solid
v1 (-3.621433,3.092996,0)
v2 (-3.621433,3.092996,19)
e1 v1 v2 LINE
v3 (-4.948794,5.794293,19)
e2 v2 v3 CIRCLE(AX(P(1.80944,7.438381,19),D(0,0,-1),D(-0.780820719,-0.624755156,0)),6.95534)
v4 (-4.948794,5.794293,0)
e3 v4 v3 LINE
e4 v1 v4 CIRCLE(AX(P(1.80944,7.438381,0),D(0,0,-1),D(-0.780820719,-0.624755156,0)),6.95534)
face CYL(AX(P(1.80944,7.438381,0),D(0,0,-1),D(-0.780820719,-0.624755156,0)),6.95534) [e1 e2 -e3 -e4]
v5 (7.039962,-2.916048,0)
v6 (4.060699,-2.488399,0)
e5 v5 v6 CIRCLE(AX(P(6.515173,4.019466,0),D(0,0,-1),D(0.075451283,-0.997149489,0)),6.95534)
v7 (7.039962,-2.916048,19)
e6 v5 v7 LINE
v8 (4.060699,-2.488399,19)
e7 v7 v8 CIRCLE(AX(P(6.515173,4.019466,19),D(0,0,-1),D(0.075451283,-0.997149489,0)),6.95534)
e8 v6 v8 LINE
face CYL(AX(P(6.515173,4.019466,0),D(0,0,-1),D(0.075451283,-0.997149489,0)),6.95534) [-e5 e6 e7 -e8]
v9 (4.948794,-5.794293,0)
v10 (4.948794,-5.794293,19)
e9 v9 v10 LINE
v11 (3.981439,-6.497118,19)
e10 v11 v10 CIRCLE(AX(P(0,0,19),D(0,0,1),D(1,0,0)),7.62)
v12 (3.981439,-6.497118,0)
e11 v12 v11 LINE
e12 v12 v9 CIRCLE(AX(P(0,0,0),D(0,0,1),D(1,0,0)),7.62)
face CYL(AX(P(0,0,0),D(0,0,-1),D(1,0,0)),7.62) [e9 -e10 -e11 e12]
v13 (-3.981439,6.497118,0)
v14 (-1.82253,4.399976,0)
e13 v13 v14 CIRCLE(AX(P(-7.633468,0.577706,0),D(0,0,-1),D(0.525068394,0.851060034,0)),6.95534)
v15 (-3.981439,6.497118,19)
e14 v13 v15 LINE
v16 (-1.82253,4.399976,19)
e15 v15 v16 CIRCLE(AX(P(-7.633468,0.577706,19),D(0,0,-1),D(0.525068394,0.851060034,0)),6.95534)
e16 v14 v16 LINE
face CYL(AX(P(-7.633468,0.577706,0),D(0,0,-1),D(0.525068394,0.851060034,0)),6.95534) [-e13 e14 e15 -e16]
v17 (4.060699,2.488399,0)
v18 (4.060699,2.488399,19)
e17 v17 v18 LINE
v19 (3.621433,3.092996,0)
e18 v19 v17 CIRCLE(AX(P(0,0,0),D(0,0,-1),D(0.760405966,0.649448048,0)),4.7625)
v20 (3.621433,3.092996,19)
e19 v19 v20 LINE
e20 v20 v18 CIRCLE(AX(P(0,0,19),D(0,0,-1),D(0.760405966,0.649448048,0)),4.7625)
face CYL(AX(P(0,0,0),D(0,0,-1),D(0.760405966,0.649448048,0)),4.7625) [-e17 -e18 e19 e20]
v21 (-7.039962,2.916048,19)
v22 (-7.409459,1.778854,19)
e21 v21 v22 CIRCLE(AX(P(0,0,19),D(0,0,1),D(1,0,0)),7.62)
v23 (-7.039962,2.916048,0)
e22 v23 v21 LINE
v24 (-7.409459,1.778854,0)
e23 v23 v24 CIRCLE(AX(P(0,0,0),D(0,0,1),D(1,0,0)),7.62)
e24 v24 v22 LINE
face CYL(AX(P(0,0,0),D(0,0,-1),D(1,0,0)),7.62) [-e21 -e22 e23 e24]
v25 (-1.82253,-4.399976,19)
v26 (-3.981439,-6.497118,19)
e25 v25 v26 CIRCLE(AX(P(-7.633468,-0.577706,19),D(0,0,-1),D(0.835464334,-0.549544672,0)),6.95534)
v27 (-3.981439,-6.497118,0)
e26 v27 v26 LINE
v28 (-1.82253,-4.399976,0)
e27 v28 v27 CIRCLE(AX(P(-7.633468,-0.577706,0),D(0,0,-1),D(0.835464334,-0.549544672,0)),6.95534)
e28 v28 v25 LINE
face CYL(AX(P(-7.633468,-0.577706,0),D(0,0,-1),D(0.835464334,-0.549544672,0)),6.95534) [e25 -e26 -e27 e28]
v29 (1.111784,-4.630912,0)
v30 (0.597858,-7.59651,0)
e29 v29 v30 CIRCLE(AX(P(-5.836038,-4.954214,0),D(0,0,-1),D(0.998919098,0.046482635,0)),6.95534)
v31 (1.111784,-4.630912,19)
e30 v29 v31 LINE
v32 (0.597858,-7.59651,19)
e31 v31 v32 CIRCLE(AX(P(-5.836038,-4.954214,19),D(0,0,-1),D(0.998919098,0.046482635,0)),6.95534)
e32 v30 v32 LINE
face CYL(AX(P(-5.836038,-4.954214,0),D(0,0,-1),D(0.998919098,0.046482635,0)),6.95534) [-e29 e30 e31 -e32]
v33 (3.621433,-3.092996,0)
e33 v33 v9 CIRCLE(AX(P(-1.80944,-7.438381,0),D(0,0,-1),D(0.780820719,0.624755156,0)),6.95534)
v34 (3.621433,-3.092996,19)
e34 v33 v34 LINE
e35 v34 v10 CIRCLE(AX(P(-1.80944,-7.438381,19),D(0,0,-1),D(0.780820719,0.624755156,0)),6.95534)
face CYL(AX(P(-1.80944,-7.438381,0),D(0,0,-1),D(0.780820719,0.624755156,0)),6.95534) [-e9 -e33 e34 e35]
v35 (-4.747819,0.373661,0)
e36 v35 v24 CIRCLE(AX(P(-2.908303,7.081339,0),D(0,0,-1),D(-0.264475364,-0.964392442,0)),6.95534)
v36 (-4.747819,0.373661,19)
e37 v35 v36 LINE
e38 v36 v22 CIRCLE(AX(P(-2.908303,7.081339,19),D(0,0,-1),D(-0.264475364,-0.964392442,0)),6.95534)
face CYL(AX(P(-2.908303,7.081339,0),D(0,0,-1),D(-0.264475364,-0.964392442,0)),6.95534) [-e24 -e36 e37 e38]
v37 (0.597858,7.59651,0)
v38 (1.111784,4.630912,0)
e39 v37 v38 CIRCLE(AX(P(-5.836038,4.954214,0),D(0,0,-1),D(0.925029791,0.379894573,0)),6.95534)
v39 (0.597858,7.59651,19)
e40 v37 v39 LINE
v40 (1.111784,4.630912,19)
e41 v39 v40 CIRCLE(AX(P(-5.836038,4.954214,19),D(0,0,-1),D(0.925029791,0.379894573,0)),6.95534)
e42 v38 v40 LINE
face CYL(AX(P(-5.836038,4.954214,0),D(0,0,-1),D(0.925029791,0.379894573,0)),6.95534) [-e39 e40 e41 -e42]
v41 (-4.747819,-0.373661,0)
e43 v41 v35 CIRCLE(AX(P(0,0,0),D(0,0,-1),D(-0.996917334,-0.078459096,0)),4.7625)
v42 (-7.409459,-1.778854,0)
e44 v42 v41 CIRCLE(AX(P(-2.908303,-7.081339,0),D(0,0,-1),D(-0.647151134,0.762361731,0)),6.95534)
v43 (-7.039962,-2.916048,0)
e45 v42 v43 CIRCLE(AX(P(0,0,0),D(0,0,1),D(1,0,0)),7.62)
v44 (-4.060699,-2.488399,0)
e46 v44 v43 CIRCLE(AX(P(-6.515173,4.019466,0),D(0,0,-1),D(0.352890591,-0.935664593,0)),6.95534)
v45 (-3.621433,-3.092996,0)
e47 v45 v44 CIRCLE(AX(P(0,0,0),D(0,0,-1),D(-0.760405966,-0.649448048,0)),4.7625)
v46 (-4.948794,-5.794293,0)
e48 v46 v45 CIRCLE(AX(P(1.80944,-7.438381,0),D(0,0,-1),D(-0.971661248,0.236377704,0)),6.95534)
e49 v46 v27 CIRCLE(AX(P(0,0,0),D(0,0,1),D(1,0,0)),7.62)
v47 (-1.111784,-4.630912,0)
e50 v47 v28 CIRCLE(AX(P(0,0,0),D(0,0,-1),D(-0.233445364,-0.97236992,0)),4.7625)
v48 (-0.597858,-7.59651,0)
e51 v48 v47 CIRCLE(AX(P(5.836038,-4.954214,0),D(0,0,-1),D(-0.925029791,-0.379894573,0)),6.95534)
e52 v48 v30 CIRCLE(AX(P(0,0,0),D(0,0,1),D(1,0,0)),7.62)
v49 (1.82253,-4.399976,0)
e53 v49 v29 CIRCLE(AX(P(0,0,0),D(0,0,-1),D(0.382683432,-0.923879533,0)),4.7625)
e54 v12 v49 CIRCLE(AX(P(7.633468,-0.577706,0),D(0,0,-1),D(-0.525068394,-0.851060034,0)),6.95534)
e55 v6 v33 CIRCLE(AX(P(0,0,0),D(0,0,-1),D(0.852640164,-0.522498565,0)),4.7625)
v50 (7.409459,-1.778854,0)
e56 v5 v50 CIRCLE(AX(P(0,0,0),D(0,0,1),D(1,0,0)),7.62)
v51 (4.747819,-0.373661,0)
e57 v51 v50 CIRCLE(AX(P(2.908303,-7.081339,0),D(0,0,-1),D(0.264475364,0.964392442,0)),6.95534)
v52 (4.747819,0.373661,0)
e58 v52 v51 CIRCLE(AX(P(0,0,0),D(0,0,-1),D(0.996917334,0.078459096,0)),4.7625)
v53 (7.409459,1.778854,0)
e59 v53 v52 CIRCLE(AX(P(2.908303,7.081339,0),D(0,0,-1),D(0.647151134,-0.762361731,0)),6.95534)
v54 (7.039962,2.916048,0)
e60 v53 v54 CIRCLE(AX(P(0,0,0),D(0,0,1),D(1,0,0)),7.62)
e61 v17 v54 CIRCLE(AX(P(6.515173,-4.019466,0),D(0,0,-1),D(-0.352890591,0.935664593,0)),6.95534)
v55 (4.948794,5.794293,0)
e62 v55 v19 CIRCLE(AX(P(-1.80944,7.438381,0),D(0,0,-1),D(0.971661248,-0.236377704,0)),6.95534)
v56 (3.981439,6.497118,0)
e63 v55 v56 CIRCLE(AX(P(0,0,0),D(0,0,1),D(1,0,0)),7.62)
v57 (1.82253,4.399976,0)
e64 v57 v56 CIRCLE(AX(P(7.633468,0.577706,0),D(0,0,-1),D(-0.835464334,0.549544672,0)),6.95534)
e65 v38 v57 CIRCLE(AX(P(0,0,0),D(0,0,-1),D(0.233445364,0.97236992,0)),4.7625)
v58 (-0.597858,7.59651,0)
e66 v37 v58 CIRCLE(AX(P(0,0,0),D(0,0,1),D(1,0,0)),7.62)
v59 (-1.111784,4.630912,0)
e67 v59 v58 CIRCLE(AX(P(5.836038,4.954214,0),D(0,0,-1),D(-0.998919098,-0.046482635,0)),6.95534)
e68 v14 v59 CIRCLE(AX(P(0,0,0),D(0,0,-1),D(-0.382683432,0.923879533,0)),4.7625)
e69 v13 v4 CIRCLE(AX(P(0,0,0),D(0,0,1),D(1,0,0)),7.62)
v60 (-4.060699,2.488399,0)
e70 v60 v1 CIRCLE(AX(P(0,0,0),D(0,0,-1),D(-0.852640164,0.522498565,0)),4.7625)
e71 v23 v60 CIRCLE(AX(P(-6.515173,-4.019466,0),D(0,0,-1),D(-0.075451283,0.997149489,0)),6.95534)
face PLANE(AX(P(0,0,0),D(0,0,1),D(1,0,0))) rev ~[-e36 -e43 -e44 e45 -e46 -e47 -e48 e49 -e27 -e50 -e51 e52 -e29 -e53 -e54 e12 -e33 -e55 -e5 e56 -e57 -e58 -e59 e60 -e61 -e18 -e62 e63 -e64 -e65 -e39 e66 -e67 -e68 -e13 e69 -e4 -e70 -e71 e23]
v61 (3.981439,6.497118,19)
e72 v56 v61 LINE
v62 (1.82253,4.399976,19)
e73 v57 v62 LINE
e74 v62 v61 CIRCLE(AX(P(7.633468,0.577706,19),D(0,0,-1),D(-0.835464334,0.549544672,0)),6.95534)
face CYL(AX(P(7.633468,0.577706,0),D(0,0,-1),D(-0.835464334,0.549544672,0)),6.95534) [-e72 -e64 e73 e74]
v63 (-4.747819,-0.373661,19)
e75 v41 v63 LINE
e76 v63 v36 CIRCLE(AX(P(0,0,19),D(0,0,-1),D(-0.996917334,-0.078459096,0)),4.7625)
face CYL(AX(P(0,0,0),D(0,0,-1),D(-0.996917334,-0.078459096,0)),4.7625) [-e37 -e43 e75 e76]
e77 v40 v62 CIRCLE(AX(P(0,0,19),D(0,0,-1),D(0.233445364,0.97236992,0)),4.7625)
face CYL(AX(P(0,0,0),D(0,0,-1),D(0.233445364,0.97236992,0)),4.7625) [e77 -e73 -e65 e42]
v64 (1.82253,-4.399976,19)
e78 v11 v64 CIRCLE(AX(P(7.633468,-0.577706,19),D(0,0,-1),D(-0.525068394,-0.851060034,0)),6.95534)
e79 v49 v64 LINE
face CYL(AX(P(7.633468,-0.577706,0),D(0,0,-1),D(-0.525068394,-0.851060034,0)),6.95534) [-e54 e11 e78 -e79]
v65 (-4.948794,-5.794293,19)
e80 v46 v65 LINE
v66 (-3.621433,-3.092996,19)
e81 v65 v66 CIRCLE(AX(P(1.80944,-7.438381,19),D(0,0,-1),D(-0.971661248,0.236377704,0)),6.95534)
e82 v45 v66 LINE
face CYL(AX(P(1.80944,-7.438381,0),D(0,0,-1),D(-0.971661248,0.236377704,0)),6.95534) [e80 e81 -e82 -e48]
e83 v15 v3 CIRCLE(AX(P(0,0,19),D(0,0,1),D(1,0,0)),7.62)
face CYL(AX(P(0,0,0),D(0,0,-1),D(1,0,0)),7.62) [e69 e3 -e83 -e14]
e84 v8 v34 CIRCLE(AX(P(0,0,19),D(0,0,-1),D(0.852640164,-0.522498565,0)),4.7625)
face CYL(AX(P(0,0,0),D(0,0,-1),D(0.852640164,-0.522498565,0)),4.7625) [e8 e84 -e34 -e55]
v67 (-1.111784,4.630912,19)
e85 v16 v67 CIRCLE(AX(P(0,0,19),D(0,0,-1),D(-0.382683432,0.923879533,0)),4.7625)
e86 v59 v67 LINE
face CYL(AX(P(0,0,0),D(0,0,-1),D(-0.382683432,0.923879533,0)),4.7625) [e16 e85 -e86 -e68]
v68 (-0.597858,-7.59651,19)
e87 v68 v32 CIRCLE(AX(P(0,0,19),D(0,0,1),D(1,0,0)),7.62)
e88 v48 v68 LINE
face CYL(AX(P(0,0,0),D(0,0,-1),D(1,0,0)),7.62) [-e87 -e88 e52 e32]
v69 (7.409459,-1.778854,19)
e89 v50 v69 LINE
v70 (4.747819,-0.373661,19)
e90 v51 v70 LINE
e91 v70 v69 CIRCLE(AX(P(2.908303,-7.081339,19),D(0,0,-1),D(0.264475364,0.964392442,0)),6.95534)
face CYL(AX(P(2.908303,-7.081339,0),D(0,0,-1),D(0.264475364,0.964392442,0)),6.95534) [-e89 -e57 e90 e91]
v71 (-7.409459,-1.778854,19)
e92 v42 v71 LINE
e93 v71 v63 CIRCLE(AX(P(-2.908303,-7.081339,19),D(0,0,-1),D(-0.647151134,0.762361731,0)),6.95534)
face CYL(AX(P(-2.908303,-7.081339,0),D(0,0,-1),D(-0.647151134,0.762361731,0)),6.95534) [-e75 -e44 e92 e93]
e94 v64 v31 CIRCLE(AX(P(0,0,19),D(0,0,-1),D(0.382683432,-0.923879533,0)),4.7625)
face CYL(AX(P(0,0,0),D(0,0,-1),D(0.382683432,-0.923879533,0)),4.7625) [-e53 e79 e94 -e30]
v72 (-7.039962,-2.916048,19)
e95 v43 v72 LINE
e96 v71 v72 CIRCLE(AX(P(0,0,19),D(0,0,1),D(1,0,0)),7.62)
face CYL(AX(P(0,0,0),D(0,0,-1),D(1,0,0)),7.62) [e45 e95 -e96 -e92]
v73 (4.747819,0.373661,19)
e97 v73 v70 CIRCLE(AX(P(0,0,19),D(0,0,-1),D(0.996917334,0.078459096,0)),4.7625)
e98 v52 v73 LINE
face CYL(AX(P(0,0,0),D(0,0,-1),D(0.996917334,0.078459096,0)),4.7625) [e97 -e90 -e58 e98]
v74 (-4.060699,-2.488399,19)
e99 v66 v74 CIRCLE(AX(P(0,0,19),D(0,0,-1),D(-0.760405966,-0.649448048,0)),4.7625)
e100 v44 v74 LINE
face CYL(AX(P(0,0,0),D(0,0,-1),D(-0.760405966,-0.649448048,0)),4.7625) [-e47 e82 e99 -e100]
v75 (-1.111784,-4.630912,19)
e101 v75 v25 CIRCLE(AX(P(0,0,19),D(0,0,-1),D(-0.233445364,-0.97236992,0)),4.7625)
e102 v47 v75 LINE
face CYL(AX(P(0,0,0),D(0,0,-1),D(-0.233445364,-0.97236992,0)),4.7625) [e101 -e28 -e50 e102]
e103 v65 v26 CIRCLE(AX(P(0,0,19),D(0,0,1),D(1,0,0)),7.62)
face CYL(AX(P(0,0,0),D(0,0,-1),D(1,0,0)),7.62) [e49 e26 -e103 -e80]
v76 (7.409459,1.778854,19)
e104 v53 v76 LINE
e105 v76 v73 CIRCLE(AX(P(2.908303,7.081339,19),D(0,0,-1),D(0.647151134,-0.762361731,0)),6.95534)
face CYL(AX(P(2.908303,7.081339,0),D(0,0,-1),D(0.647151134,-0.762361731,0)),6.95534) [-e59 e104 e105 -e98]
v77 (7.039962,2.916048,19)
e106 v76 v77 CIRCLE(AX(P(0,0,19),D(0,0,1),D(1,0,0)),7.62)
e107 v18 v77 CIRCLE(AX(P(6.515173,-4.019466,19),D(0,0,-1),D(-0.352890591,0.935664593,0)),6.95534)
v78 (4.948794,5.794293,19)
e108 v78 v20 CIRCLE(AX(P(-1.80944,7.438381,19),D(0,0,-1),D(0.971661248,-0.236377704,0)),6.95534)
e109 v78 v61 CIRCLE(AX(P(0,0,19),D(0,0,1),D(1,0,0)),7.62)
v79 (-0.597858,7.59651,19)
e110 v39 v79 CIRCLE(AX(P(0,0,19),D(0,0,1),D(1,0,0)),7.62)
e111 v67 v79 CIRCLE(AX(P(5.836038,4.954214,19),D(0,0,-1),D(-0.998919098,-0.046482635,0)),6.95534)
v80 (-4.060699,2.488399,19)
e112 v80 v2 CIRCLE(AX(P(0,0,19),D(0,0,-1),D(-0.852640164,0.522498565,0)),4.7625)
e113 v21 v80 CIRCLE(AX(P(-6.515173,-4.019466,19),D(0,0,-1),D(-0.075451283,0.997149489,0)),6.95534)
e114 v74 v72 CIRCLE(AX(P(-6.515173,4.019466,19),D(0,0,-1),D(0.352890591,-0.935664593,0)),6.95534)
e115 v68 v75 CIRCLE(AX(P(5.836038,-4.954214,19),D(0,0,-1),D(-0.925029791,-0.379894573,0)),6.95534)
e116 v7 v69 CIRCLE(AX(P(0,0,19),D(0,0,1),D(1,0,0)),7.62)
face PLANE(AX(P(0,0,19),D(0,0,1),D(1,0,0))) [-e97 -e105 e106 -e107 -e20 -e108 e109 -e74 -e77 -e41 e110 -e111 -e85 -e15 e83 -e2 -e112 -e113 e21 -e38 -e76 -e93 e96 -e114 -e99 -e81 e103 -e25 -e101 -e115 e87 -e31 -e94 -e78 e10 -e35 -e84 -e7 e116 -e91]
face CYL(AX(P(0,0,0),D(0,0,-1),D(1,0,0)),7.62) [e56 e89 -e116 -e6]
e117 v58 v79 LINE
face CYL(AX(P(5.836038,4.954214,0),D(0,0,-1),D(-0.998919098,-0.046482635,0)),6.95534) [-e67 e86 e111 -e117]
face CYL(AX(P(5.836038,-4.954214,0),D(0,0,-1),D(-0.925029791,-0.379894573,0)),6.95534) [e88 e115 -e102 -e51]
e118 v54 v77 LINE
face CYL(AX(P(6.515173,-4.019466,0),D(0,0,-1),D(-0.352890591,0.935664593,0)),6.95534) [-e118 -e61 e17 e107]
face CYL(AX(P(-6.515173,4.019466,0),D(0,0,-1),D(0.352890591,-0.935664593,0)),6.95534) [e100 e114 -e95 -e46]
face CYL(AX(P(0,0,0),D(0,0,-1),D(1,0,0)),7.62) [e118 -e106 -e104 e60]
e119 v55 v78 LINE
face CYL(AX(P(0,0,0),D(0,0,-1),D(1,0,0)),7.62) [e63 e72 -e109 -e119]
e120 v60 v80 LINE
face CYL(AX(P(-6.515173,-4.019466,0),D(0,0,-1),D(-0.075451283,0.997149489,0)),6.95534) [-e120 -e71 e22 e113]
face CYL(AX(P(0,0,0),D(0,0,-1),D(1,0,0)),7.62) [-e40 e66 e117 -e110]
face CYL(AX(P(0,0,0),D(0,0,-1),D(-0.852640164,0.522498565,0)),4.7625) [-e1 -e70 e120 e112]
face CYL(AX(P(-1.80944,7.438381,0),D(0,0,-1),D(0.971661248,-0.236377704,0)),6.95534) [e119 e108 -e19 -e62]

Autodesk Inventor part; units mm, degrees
sketch "Sketch1" plane through (0, 0, 0) normal (0, 0, 1) x (1, 0, 0)
  circle A0 centre (0, 0) radius 7.62
  dimension "d0" = 15.24
extrude "Extrusion1" add sketch "Sketch1" along normal blind 19
ref_plane "Work Plane2" through (0, 0, 9.5) normal (0, 0, 1) x (1, 0, 0)
sketch "Sketch2" plane through (0, 0, 0) normal (0, 0, -1) x (-1, 0, 0)
  circle A0 centre (0, 0) radius 7.62 projected
  circle A1 centre (0, 0) radius 6.35
  dimension "d3" = 12.7
surface extrude "Pitch Diameter" sketch "Sketch2" against normal through all shown no curves A1
ref_plane "Work Plane8" through (0, 0, 0) normal (0.9510565, 0.309017, 0) x (0, 0, 1)
ref_plane "Work Plane9" through (0, 0, 0) normal (1, 0, 0) x (0, 1, 0)
spur gear teeth "Spur Gear" teeth 10 pitch diameter 12.7 tip diameter 15.24 root diameter 9.525 face width 19 start plane through (0, 0, 0) normal (0, 0, -1) x (-1, 0, 0)
equation "\"d0\" = da_da"
equation "\"d1\" = da_b"
equation "\"d3\" = da_dw"
equation "\"d16\" = da_aw"
equation "\"d43\" = da_aw"
equation "\"d46\" = da_aw"
equation "\"da_da\" = 15.24"
equation "\"da_b\" = 19"
equation "\"da_dw\" = 12.7"
equation "\"da_aw\" = 38.1"
properties part number "Spur Gear1" material "Steel"
